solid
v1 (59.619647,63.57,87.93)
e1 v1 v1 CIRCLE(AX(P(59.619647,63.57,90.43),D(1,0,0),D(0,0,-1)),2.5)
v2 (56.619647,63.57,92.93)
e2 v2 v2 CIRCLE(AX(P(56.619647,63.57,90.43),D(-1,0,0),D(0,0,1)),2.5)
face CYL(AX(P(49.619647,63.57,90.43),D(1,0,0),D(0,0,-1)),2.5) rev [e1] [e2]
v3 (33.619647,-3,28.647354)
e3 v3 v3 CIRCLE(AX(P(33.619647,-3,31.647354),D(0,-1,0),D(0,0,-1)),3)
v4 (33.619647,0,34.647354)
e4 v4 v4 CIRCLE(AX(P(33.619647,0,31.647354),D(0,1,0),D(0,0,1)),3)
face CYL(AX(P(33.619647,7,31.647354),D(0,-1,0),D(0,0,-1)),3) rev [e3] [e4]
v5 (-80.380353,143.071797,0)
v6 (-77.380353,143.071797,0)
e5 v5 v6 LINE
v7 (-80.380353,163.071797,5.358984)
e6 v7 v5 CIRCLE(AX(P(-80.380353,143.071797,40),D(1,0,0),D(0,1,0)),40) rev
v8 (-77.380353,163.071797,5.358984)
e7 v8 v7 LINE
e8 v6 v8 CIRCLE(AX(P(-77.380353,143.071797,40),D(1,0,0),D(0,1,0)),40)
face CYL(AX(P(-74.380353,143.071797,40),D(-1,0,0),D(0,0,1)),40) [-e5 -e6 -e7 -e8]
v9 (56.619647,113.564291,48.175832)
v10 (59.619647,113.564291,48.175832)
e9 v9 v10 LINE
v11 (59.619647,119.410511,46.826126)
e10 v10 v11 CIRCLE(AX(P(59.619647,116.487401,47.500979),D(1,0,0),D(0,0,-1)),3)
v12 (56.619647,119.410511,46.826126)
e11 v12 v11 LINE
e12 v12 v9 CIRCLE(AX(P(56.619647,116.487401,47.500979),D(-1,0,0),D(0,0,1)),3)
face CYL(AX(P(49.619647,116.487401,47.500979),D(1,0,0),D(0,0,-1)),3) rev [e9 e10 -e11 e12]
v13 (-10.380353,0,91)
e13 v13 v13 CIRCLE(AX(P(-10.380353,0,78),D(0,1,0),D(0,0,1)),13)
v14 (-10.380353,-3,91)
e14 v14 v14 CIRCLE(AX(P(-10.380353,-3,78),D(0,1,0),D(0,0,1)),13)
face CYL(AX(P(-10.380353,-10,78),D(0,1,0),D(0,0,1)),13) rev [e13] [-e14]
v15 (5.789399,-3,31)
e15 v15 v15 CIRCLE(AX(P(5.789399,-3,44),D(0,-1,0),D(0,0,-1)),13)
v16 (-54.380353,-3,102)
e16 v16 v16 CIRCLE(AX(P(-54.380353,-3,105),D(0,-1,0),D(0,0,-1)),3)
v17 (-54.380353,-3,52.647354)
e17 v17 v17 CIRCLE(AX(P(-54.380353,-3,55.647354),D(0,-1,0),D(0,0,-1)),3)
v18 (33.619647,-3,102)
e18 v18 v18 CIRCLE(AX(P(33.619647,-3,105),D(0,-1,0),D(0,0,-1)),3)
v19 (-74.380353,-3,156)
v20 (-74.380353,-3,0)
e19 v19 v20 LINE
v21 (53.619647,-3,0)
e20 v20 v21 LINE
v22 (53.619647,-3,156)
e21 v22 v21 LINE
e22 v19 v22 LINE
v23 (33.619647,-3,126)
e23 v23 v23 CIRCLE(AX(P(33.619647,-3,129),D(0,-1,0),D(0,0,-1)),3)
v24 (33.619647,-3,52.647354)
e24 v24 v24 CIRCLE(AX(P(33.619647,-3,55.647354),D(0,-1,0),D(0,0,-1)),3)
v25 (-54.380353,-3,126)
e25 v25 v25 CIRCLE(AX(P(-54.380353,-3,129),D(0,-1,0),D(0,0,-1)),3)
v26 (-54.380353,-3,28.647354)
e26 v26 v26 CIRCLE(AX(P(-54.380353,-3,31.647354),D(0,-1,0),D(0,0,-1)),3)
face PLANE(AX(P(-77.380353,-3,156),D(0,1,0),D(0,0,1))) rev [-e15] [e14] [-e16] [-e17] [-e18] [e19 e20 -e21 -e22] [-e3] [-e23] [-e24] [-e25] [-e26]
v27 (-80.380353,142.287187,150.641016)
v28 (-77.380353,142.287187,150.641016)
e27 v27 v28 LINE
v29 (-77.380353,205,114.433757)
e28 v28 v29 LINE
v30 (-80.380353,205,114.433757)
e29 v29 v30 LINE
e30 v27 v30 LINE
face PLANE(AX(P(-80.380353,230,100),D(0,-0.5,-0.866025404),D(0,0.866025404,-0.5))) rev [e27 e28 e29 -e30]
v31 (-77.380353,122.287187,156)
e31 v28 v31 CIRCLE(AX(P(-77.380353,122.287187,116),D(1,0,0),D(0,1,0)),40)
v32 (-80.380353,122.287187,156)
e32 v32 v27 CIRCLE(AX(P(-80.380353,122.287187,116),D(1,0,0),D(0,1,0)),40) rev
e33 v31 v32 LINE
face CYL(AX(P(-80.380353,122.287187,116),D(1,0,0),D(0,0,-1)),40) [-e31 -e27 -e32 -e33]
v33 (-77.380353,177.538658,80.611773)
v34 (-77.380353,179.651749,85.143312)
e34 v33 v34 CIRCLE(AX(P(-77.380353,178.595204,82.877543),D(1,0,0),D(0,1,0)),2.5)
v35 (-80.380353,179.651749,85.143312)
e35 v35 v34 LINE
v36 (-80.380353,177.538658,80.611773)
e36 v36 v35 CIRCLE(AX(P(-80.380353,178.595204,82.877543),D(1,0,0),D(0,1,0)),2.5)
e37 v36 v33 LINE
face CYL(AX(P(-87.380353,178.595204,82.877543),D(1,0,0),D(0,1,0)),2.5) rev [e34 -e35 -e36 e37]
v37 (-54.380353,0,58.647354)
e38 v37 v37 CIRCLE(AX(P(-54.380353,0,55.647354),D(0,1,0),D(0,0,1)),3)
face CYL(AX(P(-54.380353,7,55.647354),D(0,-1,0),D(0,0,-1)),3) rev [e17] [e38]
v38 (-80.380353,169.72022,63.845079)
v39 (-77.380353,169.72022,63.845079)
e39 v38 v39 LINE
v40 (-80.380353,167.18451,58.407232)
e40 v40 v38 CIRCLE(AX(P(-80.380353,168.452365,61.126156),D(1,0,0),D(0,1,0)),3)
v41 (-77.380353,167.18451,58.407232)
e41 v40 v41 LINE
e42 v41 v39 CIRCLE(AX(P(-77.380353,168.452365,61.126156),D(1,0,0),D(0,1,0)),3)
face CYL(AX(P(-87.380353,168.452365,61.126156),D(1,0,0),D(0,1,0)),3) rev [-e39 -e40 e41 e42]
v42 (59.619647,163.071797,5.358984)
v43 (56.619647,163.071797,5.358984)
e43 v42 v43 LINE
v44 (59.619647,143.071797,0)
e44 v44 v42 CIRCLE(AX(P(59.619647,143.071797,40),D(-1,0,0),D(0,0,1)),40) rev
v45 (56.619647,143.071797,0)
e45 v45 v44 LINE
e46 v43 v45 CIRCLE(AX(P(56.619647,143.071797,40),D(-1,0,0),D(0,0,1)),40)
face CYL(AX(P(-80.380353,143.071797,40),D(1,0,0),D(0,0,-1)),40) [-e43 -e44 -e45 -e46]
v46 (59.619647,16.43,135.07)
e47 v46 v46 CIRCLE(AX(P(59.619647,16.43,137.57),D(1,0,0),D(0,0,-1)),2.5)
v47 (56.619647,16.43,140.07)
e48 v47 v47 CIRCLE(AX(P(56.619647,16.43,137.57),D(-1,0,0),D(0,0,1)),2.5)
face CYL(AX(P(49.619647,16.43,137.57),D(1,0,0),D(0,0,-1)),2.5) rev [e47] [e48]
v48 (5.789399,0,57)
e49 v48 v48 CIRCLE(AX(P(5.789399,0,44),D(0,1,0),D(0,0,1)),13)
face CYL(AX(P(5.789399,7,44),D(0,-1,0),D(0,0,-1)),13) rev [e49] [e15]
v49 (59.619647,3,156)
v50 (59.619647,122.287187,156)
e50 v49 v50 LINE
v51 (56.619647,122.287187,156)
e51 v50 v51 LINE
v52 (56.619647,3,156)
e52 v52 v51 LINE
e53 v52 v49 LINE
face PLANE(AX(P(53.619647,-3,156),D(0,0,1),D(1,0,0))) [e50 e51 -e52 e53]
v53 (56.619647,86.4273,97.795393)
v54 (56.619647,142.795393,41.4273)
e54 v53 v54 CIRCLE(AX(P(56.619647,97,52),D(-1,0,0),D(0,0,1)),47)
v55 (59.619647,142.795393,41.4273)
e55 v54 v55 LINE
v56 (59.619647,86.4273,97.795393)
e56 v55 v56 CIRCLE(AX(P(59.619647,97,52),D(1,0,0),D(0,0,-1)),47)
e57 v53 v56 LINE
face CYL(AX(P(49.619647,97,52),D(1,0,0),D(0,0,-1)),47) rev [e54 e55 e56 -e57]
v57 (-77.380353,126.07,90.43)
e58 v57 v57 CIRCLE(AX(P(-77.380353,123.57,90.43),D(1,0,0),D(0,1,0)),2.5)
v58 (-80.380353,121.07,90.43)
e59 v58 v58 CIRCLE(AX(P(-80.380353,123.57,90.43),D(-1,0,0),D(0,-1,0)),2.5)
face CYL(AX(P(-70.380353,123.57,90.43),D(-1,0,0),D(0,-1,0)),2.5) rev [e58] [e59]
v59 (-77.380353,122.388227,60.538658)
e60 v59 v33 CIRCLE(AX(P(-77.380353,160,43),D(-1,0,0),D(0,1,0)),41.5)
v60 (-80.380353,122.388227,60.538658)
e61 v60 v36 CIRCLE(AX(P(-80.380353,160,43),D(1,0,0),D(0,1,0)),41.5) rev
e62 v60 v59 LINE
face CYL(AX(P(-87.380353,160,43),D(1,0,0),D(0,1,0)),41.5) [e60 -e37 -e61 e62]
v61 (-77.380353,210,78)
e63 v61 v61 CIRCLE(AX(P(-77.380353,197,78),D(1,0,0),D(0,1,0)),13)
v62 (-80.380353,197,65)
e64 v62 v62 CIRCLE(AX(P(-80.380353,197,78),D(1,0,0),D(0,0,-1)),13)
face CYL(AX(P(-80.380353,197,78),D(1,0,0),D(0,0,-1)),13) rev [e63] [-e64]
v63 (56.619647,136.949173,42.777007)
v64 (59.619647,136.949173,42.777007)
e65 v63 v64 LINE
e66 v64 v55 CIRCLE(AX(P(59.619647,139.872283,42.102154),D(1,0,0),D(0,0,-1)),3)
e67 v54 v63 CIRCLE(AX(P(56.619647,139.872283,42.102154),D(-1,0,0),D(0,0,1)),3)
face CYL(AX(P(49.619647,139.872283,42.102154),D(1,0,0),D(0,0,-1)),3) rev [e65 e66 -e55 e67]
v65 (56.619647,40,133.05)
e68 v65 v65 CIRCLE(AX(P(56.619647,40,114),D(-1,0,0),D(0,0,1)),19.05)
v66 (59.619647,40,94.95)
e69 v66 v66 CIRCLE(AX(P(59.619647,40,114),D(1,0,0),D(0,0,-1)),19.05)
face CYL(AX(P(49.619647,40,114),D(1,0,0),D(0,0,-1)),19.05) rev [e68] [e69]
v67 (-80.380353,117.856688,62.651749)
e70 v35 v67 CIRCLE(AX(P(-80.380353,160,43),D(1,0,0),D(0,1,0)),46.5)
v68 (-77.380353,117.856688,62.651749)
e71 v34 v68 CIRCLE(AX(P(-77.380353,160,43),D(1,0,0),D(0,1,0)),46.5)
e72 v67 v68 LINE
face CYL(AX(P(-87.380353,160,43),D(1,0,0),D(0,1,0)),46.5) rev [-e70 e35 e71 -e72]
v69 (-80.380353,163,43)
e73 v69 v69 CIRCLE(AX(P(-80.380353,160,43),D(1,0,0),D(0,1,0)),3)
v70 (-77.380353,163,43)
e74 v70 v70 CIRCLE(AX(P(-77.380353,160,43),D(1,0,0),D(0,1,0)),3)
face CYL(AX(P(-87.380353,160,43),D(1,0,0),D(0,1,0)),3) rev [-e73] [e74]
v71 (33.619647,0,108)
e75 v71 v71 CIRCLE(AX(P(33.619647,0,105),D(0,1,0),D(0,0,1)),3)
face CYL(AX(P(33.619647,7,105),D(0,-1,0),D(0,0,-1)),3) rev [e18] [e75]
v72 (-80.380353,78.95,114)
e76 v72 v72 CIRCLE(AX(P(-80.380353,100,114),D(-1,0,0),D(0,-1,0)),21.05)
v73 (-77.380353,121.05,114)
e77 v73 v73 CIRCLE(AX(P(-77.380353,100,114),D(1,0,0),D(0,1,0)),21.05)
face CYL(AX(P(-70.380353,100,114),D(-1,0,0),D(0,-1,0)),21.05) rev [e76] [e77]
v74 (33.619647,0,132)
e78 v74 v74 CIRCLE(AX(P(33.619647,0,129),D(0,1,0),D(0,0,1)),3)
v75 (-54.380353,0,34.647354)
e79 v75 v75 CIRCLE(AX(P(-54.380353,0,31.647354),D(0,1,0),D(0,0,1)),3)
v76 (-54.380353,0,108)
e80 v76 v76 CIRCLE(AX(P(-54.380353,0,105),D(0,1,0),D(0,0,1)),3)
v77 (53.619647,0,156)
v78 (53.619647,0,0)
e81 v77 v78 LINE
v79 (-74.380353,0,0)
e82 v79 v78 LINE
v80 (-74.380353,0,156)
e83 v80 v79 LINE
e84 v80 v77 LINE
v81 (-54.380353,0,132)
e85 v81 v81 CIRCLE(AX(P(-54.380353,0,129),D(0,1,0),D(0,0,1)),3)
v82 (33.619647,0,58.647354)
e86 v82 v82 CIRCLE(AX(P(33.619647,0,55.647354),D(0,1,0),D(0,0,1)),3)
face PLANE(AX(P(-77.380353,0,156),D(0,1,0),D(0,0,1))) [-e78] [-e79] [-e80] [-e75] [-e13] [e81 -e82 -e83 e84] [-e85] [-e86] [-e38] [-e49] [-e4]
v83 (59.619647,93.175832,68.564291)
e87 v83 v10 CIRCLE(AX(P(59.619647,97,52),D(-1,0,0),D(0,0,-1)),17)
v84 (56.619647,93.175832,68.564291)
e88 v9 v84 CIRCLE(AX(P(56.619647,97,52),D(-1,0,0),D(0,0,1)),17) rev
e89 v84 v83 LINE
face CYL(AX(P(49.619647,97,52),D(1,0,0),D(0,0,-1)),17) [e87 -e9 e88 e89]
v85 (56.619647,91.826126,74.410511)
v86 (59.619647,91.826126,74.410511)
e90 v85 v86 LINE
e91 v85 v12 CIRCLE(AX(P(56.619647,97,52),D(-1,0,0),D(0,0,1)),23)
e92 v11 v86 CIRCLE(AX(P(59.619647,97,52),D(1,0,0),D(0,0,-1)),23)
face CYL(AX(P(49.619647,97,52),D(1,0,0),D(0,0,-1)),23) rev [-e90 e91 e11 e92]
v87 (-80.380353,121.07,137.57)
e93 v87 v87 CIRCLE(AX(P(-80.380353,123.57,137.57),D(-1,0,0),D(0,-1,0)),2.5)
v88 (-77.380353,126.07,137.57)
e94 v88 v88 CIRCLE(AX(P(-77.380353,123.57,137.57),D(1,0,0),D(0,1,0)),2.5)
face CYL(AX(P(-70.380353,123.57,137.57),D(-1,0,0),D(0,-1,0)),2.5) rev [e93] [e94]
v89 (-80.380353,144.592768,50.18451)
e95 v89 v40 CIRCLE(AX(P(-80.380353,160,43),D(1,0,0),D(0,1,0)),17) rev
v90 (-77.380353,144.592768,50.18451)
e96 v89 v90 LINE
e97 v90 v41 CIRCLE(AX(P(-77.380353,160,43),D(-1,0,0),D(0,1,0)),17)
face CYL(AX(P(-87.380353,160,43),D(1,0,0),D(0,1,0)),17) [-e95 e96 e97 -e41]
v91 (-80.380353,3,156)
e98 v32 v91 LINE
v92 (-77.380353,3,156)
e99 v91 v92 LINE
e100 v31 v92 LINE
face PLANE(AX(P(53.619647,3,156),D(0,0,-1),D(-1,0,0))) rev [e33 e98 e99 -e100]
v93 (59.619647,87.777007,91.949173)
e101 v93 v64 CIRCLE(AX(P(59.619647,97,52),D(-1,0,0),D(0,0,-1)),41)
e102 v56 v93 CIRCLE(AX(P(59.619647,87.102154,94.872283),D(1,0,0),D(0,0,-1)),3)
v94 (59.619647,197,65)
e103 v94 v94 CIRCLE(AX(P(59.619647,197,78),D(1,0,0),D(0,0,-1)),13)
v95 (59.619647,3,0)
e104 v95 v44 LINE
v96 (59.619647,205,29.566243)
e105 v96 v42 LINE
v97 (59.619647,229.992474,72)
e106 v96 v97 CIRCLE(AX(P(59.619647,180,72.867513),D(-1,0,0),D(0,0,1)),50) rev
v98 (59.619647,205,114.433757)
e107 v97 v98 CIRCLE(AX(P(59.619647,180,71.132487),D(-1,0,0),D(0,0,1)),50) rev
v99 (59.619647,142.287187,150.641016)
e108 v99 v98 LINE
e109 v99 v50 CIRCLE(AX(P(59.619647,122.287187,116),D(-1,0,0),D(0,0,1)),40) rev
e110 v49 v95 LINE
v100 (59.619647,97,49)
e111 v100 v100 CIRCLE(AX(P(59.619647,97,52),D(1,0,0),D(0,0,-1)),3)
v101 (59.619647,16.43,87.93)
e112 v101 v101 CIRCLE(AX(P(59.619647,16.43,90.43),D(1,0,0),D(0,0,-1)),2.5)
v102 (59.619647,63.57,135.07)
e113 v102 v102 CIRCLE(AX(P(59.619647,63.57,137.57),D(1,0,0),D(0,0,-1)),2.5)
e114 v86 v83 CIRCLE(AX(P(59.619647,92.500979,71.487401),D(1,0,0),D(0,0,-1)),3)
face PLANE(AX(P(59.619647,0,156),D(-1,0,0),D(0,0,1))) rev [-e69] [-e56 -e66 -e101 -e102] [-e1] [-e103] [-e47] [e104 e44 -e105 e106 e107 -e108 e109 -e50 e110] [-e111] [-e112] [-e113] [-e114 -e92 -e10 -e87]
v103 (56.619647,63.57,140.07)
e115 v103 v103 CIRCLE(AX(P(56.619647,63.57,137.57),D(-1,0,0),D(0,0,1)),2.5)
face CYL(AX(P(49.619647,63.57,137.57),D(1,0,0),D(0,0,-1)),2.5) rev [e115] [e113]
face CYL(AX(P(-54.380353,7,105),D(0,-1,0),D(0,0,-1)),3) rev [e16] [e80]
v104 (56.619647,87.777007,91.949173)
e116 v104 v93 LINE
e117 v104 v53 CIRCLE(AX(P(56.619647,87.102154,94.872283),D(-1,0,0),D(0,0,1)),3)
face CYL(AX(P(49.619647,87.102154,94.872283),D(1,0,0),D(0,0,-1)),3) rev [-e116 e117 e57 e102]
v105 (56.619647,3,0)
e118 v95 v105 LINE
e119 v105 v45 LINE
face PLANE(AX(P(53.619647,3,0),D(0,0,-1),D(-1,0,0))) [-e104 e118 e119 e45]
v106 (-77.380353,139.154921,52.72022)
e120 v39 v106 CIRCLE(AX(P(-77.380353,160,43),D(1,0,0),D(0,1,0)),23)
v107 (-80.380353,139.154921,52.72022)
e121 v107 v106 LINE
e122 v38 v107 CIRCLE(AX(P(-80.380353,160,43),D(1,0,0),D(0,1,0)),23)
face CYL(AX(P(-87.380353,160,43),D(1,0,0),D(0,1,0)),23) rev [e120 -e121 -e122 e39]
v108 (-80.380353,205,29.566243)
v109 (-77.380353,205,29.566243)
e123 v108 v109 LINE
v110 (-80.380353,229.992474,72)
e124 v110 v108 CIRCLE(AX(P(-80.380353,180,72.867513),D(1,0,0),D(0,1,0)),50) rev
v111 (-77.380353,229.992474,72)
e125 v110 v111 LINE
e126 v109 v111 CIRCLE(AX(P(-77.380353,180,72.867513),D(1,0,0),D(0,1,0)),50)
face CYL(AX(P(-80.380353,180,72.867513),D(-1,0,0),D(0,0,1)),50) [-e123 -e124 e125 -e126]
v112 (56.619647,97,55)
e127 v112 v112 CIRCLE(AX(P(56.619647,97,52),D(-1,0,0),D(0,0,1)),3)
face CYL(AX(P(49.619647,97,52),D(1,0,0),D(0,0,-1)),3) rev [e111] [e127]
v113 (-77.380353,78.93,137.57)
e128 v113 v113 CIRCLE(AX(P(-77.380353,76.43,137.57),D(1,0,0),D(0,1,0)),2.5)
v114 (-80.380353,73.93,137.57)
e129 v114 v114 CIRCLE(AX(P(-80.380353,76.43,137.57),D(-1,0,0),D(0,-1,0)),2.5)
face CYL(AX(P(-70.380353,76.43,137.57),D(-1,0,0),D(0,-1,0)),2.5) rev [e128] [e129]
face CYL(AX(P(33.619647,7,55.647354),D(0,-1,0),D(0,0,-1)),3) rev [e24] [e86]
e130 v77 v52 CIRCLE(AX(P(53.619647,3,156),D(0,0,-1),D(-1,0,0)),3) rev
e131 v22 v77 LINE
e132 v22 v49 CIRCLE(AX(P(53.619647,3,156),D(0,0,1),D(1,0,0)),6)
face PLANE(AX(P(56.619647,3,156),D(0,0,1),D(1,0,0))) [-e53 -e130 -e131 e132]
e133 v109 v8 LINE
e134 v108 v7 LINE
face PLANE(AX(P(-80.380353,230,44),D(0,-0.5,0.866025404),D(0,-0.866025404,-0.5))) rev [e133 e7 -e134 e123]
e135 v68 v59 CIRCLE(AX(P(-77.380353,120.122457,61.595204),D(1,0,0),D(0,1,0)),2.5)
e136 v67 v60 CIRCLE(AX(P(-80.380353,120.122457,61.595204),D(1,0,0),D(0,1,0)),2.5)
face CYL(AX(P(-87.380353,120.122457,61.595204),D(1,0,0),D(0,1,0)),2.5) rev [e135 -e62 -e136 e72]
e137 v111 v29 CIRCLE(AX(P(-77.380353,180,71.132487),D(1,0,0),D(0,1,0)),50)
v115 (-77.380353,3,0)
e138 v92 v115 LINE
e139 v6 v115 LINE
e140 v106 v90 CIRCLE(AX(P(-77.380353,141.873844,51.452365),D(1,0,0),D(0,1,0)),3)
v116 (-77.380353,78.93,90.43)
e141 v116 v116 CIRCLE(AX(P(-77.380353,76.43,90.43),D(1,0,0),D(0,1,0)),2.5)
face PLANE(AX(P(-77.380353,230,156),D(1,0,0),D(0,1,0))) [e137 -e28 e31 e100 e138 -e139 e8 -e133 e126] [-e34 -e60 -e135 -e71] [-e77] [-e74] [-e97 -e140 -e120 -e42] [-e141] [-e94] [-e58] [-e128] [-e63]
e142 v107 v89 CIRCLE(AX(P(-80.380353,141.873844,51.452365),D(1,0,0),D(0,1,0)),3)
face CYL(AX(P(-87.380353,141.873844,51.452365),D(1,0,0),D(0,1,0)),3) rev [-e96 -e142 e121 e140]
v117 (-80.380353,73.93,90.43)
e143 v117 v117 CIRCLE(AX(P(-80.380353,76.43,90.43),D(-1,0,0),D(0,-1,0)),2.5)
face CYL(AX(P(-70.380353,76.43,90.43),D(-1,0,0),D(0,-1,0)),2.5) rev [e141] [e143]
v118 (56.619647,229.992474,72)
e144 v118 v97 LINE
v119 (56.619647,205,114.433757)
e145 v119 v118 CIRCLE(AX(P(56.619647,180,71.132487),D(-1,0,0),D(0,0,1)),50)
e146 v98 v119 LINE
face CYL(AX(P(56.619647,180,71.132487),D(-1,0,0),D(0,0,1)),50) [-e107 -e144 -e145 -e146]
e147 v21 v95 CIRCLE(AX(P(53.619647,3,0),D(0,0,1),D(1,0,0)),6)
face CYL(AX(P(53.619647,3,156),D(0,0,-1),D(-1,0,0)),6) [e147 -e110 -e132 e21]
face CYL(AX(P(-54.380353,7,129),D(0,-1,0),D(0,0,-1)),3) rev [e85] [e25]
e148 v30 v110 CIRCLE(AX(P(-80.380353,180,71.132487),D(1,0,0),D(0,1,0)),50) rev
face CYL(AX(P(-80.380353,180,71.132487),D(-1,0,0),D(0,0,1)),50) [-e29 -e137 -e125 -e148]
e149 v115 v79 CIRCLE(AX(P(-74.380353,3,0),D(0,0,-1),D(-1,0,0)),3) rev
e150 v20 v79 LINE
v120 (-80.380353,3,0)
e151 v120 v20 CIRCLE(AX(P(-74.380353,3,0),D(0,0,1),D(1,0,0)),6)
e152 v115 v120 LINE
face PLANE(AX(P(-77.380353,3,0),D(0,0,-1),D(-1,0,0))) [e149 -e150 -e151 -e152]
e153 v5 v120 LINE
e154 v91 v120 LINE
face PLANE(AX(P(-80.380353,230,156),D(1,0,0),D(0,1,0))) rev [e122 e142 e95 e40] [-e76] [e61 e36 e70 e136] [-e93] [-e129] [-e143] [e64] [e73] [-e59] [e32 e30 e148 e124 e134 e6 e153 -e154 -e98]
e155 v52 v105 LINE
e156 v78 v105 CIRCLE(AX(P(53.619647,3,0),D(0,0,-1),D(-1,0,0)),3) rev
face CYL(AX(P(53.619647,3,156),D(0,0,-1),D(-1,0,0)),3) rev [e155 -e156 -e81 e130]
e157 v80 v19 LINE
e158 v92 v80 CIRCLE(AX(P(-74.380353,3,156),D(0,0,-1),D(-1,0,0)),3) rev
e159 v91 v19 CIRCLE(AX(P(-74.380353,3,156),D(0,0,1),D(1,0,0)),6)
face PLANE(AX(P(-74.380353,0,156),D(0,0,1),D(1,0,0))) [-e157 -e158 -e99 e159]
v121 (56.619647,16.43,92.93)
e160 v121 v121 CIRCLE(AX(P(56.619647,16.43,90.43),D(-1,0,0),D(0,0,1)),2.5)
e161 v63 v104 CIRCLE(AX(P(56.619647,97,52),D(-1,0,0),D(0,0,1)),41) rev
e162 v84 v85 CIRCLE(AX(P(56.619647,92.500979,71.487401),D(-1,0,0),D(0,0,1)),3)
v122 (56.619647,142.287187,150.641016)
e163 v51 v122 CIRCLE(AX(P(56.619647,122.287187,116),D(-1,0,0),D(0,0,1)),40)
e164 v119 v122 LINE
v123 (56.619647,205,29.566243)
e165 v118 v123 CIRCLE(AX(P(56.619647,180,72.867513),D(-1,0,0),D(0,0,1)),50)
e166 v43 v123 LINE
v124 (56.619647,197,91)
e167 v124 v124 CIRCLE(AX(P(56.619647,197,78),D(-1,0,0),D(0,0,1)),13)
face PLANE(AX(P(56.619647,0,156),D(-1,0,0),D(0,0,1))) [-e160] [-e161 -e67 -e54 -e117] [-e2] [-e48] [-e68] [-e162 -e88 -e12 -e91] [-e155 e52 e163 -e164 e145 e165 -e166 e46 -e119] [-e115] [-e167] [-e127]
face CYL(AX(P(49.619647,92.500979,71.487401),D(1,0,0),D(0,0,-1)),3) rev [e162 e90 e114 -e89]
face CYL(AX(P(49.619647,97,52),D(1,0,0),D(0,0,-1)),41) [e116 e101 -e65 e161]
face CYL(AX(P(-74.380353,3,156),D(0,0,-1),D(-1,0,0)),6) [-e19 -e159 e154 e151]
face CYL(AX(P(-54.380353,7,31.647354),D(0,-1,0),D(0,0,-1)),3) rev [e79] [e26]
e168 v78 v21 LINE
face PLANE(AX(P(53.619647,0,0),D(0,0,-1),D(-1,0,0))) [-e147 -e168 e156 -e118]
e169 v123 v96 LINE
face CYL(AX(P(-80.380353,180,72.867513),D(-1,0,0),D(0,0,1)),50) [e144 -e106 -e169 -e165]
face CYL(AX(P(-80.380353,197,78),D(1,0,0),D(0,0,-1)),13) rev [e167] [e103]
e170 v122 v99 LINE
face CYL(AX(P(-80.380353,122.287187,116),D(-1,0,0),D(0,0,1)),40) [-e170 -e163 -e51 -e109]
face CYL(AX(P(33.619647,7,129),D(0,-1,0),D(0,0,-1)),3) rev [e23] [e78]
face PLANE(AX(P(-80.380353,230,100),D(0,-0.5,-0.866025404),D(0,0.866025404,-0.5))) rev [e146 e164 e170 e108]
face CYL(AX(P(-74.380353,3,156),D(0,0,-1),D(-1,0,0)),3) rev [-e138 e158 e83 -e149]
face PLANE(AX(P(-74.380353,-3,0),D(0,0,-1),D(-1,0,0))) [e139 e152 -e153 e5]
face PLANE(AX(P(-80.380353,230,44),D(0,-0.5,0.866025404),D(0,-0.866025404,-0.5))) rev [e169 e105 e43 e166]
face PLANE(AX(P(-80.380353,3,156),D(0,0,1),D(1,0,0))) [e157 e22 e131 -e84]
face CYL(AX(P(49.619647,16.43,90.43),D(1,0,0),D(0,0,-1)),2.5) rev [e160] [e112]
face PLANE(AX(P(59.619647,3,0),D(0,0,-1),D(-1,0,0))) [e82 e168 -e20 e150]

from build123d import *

# Parameters (mm, degrees)
BASE_FLANGE1_DEPTH = 156
SKETCH6_R          = 13
CUT_EXTRUDE1_DEPTH = 312.184832535
SKETCH7_R          = 21.05
SKETCH7_R_2        = 2.5
CUT_EXTRUDE2_DEPTH = 10
SKETCH9_R          = 19.05
SKETCH9_R_2        = 2.5
CUT_EXTRUDE3_DEPTH = 10
SKETCH10_R         = 13
CUT_EXTRUDE4_DEPTH = 10
SKETCH12_R         = 13
CUT_EXTRUDE5_DEPTH = 10
SKETCH14_R         = 3
CUT_EXTRUDE6_DEPTH = 10
SKETCH15_R         = 3
CUT_EXTRUDE7_DEPTH = 10
CUT_EXTRUDE8_DEPTH = 312.184832535
FILLET1_R          = 50
FILLET2_R          = 40
SKETCH16_R         = 3
CUT_EXTRUDE9_DEPTH = 10


# Sheet-metal steps are written as plain solids
with BuildPart() as part:
    # Sketch1 → Base-Flange1 (new body)
    with BuildSketch(Plane.XY):
        with BuildLine():
            Line((-77.380352645, 230), (-77.380352645, 3))
            ThreePointArc((-77.380352645, 3), (-76.501672988, 0.878679656), (-74.380352645, 0))
            Line((-74.380352645, 0), (53.619647355, 0))
            ThreePointArc((53.619647355, 0), (55.740967699, 0.878679656), (56.619647355, 3))
            Line((56.619647355, 3), (56.619647355, 230))
            Line((56.619647355, 230), (59.619647355, 230))
            Line((59.619647355, 230), (59.619647355, 3))
            ThreePointArc((59.619647355, 3), (57.862288042, -1.242640687), (53.619647355, -3))
            Line((53.619647355, -3), (-74.380352645, -3))
            ThreePointArc((-74.380352645, -3), (-78.622993332, -1.242640687), (-80.380352645, 3))
            Line((-80.380352645, 3), (-80.380352645, 230))
            Line((-80.380352645, 230), (-77.380352645, 230))
        make_face()
    extrude(amount=BASE_FLANGE1_DEPTH)

    # Sketch6 → Cut-Extrude1 (cut, through all)
    with BuildSketch(Plane(origin=(59.619647355, 0, 0), x_dir=(0, 0, -1), z_dir=(1, 0, 0))):
        with Locations((-78, 197)):
            Circle(SKETCH6_R)
    extrude(amount=-CUT_EXTRUDE1_DEPTH, mode=Mode.SUBTRACT)

    # Sketch7 → Cut-Extrude2 (cut)
    with BuildSketch(Plane.ZY.offset(80.380352645)):
        with Locations(Location((114, 100, 0), (0, 0, 270))):
            Circle(SKETCH7_R)
        with Locations(Location((90.43, 123.57, 0), (0, 0, 270))):
            Circle(SKETCH7_R_2)
        with Locations(Location((137.57, 123.57, 0), (0, 0, 270))):
            Circle(SKETCH7_R_2)
        with Locations(Location((137.57, 76.43, 0), (0, 0, 270))):
            Circle(SKETCH7_R_2)
        with Locations(Location((90.43, 76.43, 0), (0, 0, 270))):
            Circle(SKETCH7_R_2)
    extrude(amount=-CUT_EXTRUDE2_DEPTH, mode=Mode.SUBTRACT)

    # Sketch9 → Cut-Extrude3 (cut)
    with BuildSketch(Plane(origin=(59.619647355, 0, 0), x_dir=(0, 0, -1), z_dir=(1, 0, 0))):
        with Locations((-114, 40)):
            Circle(SKETCH9_R)
        with Locations((-90.43, 63.57)):
            Circle(SKETCH9_R_2)
        with Locations((-137.57, 63.57)):
            Circle(SKETCH9_R_2)
        with Locations((-137.57, 16.43)):
            Circle(SKETCH9_R_2)
        with Locations((-90.43, 16.43)):
            Circle(SKETCH9_R_2)
    extrude(amount=-CUT_EXTRUDE3_DEPTH, mode=Mode.SUBTRACT)

    # Sketch10 → Cut-Extrude4 (cut)
    with BuildSketch(Plane(origin=(0, 0, 0), x_dir=(1, 0, 0), z_dir=(0, 1, 0))):
        with Locations(Location((-10.380352645, -78, 0), (0, 0, 270))):
            Circle(SKETCH10_R)
    extrude(amount=-CUT_EXTRUDE4_DEPTH, mode=Mode.SUBTRACT)

    # Sketch12 → Cut-Extrude5 (cut)
    with BuildSketch(Plane.XZ.offset(3)):
        with Locations(Location((5.789398738, 44.000000006, 0), (0, 0, 270))):
            Circle(SKETCH12_R)
    extrude(amount=-CUT_EXTRUDE5_DEPTH, mode=Mode.SUBTRACT)

    # Sketch14 → Cut-Extrude6 (cut)
    with BuildSketch(Plane(origin=(59.619647355, 0, 0), x_dir=(0, 0, -1), z_dir=(1, 0, 0))):
        with Locations((-52, 97)):
            Circle(SKETCH14_R)
        with BuildLine():
            ThreePointArc((-46.82612575, 119.41051149), (-68.263455967, 113.263455967), (-74.41051149, 91.82612575))
            ThreePointArc((-74.41051149, 91.82612575), (-70.812548133, 89.577868719), (-68.564291101, 93.175832076))
            ThreePointArc((-68.564291101, 93.175832076), (-64.02081528, 109.02081528), (-48.175832076, 113.564291101))
            ThreePointArc((-48.175832076, 113.564291101), (-44.577868719, 115.812548133), (-46.82612575, 119.41051149))
        make_face()
        with BuildLine():
            ThreePointArc((-41.427300446, 142.795393045), (-85.234018716, 130.234018716), (-97.795393045, 86.427300446))
            ThreePointArc((-97.795393045, 86.427300446), (-94.197429688, 84.179043415), (-91.949172656, 87.777006772))
            ThreePointArc((-91.949172656, 87.777006772), (-80.991378029, 125.991378029), (-42.777006772, 136.949172656))
            ThreePointArc((-42.777006772, 136.949172656), (-39.179043415, 139.197429688), (-41.427300446, 142.795393045))
        make_face()
    extrude(amount=-CUT_EXTRUDE6_DEPTH, mode=Mode.SUBTRACT)

    # Sketch15 → Cut-Extrude7 (cut)
    with BuildSketch(Plane(origin=(-77.380352645, 0, 0), x_dir=(0, 0, -1), z_dir=(1, 0, 0))):
        with Locations(Location((-43, 160, 0), (0, 0, 90))):
            Circle(SKETCH15_R)
        with BuildLine():
            ThreePointArc((-85.143312097, 179.651749171), (-86.695706867, 144.096063335), (-62.651749171, 117.856687903))
            ThreePointArc((-62.651749171, 117.856687903), (-59.329434049, 119.065911716), (-60.538657862, 122.388226838))
            ThreePointArc((-60.538657862, 122.388226838), (-81.997243763, 145.806164052), (-80.611773162, 177.538657862))
            ThreePointArc((-80.611773162, 177.538657862), (-81.820996975, 180.860972984), (-85.143312097, 179.651749171))
        make_face()
        with BuildLine():
            ThreePointArc((-63.845079102, 169.72022002), (-64.612930278, 152.133536704), (-52.72022002, 139.154920898))
            ThreePointArc((-52.72022002, 139.154920898), (-48.733441874, 140.605989474), (-50.18451045, 144.59276762))
            ThreePointArc((-50.18451045, 144.59276762), (-58.974774553, 154.185657563), (-58.40723238, 167.18451045))
            ThreePointArc((-58.40723238, 167.18451045), (-59.858300956, 171.171288596), (-63.845079102, 169.72022002))
        make_face()
    extrude(amount=-CUT_EXTRUDE7_DEPTH, mode=Mode.SUBTRACT)

    # Sketch13 → Cut-Extrude8 (cut, through all)
    with BuildSketch(Plane(origin=(59.619647355, 0, 0), x_dir=(0, 0, -1), z_dir=(1, 0, 0))):
        Polygon((-100, 230), (-156, 133.005154776), (-156, 230), align=None)
        Polygon((-44, 230), (0, 153.789764467), (0, 230), align=None)
    extrude(amount=-CUT_EXTRUDE8_DEPTH, mode=Mode.SUBTRACT)

    # Fillet1
    # the kernel refuses this fillet: 50 mm, written as the material it takes off along each edge
    with BuildSketch(Plane(origin=(131.788431004, 230, 44), x_dir=(0, -0.8660254037844418, -0.49999999999999445), z_dir=(-1, 0, 0)), Plane(origin=(-5.211568996, 230, 44), x_dir=(0, -0.8660254037844418, -0.49999999999999445), z_dir=(-1, 0, 0))) as fillet1_piece_1:
        with BuildLine():
            CenterArc((FILLET1_R * 0.57735026919, FILLET1_R), FILLET1_R, 210, 60)
            Line((-FILLET1_R * 0.288675134595, FILLET1_R * 0.5), (0, 0))
            Line((0, 0), (FILLET1_R * 0.57735026919, 0))
        make_face()
    extrude(amount=147.337567297, mode=Mode.SUBTRACT)
    with BuildSketch(Plane(origin=(-5.211568996, 230, 100), x_dir=(0, -0.8660254037844418, 0.49999999999999445), z_dir=(-1, 0, 0)), Plane(origin=(131.788431004, 230, 100), x_dir=(0, -0.8660254037844418, 0.49999999999999445), z_dir=(-1, 0, 0))) as fillet1_piece_2:
        with BuildLine():
            CenterArc((FILLET1_R * 0.57735026919, -FILLET1_R), FILLET1_R, 90, 60)
            Line((-FILLET1_R * 0.288675134595, -FILLET1_R * 0.5), (0, 0))
            Line((0, 0), (FILLET1_R * 0.57735026919, 0))
        make_face()
    extrude(amount=147.337567297, mode=Mode.SUBTRACT)

    # Fillet2
    fillet2_edges = [part.edges().sort_by_distance(p)[0] for p in [
        (58.119647355, 153.789764467, 0),
        (58.119647355, 133.005154776, 156),
        (-78.880352645, 133.005154776, 156),
        (-78.880352645, 153.789764467, 0),
    ]]
    fillet(fillet2_edges, radius=FILLET2_R)

    # Sketch16 → Cut-Extrude9 (cut)
    with BuildSketch(Plane.XZ.offset(3)):
        with Locations(Location((-54.380352645, 129, 0), (0, 0, 270))):
            Circle(SKETCH16_R)
        with Locations(Location((-54.380352645, 105, 0), (0, 0, 270))):
            Circle(SKETCH16_R)
        with Locations(Location((-54.380352645, 55.647353532, 0), (0, 0, 270))):
            Circle(SKETCH16_R)
        with Locations(Location((-54.380352645, 31.647353532, 0), (0, 0, 270))):
            Circle(SKETCH16_R)
        with Locations(Location((33.619647355, 129, 0), (0, 0, 270))):
            Circle(SKETCH16_R)
        with Locations(Location((33.619647355, 105, 0), (0, 0, 270))):
            Circle(SKETCH16_R)
        with Locations(Location((33.619647355, 55.647353532, 0), (0, 0, 270))):
            Circle(SKETCH16_R)
        with Locations(Location((33.619647355, 31.647353532, 0), (0, 0, 270))):
            Circle(SKETCH16_R)
    extrude(amount=-CUT_EXTRUDE9_DEPTH, mode=Mode.SUBTRACT)


solid = part.part
